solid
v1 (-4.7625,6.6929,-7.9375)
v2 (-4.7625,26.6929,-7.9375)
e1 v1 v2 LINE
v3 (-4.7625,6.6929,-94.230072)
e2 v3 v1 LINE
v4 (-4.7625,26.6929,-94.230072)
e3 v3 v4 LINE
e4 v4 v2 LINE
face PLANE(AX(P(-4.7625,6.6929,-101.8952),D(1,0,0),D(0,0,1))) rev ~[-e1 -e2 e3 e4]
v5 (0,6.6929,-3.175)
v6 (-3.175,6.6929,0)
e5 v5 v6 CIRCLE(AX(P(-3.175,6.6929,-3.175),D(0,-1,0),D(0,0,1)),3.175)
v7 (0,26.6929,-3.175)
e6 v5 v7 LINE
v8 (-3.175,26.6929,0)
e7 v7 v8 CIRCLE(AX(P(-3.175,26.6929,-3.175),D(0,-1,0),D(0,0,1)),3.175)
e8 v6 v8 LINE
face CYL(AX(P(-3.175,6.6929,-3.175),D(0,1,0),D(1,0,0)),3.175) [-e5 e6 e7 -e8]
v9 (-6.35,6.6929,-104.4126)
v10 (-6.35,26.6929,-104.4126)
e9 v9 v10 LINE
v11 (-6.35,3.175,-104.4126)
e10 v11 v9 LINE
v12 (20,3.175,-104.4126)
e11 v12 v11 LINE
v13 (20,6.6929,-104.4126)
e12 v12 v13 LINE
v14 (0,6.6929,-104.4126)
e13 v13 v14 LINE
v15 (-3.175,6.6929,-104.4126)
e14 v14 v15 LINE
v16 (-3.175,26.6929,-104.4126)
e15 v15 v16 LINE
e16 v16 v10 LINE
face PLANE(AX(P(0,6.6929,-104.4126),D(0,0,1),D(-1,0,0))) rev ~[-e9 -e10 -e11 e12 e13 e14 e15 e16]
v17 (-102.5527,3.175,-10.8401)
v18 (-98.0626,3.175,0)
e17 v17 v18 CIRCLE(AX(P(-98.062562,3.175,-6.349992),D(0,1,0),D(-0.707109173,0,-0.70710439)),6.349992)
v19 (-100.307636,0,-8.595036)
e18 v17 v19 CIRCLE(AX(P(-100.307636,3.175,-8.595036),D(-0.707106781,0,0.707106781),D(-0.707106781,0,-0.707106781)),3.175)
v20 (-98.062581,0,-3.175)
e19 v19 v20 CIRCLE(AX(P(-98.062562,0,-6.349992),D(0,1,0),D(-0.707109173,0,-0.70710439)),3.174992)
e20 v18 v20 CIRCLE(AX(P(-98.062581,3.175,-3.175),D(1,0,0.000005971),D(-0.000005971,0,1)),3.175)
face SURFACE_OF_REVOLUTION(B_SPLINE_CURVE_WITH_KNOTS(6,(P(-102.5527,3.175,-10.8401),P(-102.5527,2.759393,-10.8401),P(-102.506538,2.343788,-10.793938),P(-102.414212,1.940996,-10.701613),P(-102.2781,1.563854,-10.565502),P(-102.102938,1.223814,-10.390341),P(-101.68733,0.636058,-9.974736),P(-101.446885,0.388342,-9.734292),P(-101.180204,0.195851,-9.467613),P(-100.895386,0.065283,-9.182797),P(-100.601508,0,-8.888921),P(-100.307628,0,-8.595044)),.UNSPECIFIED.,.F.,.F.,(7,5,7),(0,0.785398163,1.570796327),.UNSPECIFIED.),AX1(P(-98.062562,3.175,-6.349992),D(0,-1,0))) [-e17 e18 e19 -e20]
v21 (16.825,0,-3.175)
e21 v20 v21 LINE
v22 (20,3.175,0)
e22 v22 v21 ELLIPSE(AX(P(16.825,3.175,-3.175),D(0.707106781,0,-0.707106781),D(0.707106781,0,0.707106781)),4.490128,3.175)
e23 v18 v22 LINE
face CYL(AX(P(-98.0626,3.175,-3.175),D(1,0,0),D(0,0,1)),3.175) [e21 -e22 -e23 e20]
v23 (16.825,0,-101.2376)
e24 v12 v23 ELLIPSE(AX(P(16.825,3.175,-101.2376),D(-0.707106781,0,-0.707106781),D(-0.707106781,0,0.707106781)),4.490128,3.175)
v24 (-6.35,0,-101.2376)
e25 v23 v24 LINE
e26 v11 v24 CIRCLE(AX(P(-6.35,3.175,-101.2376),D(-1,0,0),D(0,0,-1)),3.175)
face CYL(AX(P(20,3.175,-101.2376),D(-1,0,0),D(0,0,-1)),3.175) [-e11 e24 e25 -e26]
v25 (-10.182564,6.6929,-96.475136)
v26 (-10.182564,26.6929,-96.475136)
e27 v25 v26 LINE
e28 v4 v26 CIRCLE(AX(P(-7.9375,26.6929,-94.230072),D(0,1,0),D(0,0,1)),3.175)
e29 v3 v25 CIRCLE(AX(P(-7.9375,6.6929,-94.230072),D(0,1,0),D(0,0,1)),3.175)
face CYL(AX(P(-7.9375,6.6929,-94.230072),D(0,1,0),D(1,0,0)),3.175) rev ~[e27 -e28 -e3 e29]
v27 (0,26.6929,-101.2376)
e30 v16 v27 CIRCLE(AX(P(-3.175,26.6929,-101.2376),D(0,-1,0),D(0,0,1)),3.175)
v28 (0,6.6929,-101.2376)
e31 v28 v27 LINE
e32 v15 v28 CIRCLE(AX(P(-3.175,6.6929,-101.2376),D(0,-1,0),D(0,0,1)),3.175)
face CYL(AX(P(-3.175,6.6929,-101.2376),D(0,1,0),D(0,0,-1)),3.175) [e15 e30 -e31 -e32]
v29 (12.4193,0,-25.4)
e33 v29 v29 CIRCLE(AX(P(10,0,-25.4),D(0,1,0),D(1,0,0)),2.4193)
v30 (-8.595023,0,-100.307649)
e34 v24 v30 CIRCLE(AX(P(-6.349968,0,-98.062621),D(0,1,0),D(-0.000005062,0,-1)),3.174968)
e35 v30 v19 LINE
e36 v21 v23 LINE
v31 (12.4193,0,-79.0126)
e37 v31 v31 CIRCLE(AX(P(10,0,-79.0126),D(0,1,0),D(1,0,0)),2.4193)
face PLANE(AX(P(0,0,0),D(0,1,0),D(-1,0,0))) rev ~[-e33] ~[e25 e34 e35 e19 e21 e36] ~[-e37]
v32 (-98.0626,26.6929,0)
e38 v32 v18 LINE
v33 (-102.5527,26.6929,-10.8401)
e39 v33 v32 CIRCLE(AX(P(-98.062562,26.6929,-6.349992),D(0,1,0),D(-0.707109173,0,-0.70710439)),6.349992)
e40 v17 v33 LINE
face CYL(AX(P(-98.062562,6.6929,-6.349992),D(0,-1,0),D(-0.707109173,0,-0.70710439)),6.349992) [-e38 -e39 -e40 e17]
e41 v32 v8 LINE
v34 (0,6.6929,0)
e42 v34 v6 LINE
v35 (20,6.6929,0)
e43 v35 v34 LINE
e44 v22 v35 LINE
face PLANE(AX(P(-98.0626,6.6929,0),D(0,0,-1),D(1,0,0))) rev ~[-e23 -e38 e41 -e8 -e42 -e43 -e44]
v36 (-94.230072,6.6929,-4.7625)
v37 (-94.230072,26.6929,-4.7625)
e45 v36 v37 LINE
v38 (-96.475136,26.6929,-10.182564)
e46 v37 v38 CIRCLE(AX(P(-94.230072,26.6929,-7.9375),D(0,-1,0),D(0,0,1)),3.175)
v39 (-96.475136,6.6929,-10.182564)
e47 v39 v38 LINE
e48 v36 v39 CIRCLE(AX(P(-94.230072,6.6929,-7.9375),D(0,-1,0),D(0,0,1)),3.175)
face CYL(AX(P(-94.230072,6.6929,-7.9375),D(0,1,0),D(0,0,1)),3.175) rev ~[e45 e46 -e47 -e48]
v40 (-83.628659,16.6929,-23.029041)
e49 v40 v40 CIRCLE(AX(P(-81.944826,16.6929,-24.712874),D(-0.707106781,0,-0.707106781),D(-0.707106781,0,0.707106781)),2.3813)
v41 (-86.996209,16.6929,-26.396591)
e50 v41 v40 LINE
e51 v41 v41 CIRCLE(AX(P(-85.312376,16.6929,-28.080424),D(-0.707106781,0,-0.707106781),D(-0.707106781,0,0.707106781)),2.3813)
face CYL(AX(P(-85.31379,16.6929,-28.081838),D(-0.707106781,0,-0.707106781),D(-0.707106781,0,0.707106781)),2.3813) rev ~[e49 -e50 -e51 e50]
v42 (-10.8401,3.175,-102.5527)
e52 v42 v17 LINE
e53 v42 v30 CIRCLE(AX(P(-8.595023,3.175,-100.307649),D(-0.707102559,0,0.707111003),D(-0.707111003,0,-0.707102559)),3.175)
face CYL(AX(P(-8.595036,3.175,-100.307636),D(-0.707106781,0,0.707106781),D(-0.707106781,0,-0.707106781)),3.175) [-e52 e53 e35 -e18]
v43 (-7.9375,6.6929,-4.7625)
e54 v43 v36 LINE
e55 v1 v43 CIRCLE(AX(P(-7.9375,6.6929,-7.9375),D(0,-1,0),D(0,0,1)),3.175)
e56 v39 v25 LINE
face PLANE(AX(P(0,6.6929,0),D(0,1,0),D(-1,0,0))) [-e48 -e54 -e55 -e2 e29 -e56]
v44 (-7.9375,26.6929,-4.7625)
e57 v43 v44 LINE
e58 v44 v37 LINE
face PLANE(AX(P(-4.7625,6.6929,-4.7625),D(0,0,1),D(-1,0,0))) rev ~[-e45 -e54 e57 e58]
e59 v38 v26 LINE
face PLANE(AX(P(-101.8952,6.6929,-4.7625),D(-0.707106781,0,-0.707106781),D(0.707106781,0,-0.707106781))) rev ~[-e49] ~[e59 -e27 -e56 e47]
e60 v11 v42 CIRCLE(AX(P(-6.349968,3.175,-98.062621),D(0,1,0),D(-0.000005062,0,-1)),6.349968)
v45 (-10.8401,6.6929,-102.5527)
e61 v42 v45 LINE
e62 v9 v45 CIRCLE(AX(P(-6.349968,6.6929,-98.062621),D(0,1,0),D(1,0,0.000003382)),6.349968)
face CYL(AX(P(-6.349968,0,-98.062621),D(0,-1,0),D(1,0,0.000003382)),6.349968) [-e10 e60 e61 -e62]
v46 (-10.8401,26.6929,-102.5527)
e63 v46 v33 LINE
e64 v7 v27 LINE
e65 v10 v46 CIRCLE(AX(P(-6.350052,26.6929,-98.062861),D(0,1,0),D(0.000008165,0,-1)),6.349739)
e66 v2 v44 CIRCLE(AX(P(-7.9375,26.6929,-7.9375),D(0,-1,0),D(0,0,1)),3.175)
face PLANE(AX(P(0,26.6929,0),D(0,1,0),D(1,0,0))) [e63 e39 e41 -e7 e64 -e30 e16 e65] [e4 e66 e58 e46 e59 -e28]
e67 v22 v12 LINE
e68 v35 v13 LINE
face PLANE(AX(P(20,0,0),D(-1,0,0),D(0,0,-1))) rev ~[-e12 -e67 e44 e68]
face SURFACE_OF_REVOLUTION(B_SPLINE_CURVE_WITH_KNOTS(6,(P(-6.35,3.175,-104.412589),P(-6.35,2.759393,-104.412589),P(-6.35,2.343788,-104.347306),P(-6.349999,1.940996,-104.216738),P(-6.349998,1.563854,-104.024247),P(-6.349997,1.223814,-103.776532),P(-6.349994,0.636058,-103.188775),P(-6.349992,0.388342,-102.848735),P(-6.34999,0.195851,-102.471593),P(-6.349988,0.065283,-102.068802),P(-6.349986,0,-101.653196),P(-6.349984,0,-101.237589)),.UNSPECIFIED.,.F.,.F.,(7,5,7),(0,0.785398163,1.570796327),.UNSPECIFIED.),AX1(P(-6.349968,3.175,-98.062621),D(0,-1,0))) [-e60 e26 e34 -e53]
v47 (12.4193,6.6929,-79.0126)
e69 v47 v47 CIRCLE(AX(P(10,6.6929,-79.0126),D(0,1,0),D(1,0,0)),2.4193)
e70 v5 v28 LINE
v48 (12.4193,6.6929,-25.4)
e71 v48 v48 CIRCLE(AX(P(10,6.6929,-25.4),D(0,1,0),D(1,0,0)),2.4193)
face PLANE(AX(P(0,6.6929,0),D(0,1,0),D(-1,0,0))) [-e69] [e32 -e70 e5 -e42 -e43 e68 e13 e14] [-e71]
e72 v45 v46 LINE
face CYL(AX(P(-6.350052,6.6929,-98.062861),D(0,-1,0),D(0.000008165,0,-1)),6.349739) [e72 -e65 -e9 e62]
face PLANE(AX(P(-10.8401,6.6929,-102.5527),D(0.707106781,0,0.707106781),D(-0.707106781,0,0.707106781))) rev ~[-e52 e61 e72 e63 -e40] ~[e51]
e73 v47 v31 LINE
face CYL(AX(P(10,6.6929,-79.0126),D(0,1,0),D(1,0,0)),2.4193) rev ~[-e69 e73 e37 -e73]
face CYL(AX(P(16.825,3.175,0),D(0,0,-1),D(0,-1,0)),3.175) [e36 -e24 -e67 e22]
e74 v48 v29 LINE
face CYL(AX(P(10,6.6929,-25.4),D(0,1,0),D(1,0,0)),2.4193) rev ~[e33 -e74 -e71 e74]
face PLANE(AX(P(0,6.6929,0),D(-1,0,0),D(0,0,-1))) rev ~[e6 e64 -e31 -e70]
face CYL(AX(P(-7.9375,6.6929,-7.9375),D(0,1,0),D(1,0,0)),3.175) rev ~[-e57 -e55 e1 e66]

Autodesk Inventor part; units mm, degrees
ref_plane "YZ Plane" through (0, 0, 0) normal (1, 0, 0) x (0, 1, 0)
ref_plane "XZ Plane" through (0, 0, 0) normal (0, 1, 0) x (-1, 0, 0)
ref_plane "XY Plane" through (0, 0, 0) normal (0, 0, 1) x (1, 0, 0)
sketch "Sketch1" plane through (0, 0, 0) normal (0, 1, 0) x (-1, 0, 0)
  line L0 (0, -6.35) -> (0, -98.0626)
  line L1 (10.8401, -102.5527) -> (102.5527, -10.8401)
  line L2 (98.0626, 0) -> (6.35, 0)
  arc A0 (102.5527, -10.8401) -> (98.0626, 0) centre (98.0626, -6.35) ccw
  arc A1 (0, -98.0626) -> (10.8401, -102.5527) centre (6.35, -98.0626) ccw
  arc A2 (6.35, 0) -> (0, -6.35) centre (6.35, -6.35) ccw
  line L3 (0, 0) -> (-20, 0)
  line L4 (-20, 0) -> (-20, -104.4126)
  line L5 (-20, -104.4126) -> (0, -104.4126)
  line L6 (0, -104.4126) -> (0, 0)
  line L7 (0, 0) -> (6.35, 0)
  line L8 (0, -104.4126) -> (6.35, -104.4126)
  point P0 (113.3929, 0)
  dimension "d0" = 113.3929
  dimension "d1" = 6.35
  dimension "d8" = 20
extrude "Extrusion1" add sketch "Sketch1" along normal blind 6.6929
sketch "Sketch2" plane through (0, 6.6929, 0) normal (0, 1, 0) x (1, 0, 0)
  arc A0 (-6.35, 104.4126) -> (-10.8401, 102.5527) centre (-6.35, 98.0626) ccw projected
  line L0 (-10.8401, 102.5527) -> (-102.5527, 10.8401) projected
  arc A1 (-102.5527, 10.8401) -> (-98.0626, 0) centre (-98.0626, 6.35) ccw projected
  line L1 (-4.7625, 4.7625) -> (-104.211, 4.7625)
  line L2 (-101.8952, 4.7625) -> (-4.7625, 101.8952)
  line L3 (-4.7625, 104.211) -> (-4.7625, 4.7625)
  line L4 (-98.0626, 0) -> (20, 0) projected
  line L5 (20, 0) -> (20, 104.4126) projected
  line L6 (20, 104.4126) -> (-6.35, 104.4126) projected
  line L7 (0, 0) -> (0, 104.4126)
  point P0 (0, 0)
extrude "Extrusion2" add sketch "Sketch2" along normal blind 20 contours L6 L7 L4 A1 L0 A0
sketch "Sketch3" plane through (0, 6.6929, 0) normal (0, 1, 0) x (1, 0, 0)
  circle A0 centre (10, 25.4) radius 2.4193
  circle A1 centre (10, 79.0126) radius 2.4193
  line L0 (20, 0) -> (20, 104.4126) projected
  line L1 (0, 0) -> (20, 0) projected
  dimension "d9" = 10
  dimension "d10" = 25.4
  dimension "d11" = 25.4
  dimension "d12" = 4.8387
extrude "Extrusion3" cut sketch "Sketch3" against normal blind 12.954
sketch "Sketch5" plane through (-102.5527, 0, -10.8401) normal (-0.7071068, 0, -0.7071068) x (-0.7071068, 0, 0.7071068)
  circle A0 centre (-24.3815, 16.6929) radius 2.3813
  line L0 (-138.6815, 6.6929) -> (-138.6815, 26.6929) projected
  line L1 (-129.7012, 26.6929) -> (0, 26.6929) projected
  line L2 (-129.7012, 0) -> (0, 0) projected
  line L3 (-152.8236, 6.6929) -> (-138.6815, 6.6929) projected
  line L4 (-78.9927, 0) -> (-152.8236, 0) projected
  point P0 (-64.8506, 0)
  dimension "d15" = 114.3
  dimension "d17" = 16.6929
  dimension "d18" = 6.6929
  dimension "d19" = 4.7625
extrude "Extrusion4" cut sketch "Sketch5" against normal up to surface (4.7625 mm away)
fillet "Fillet1" radius 3.175 11 edges at (-4.7625, 16.6929, -4.7625) (-101.8952, 16.6929, -4.7625) (-4.7625, 16.6929, -101.8952) (0, 16.6929, -104.4126) (-8.78, 0, -103.9292) (-56.6964, 0, -56.6964) (-103.9292, 0, -3.92) (-39.0313, 0, 0) (6.825, 0, -104.4126) (20, 0, -52.2063) (0, 16.6929, 0)
properties part number "Part1_3DPrint"
